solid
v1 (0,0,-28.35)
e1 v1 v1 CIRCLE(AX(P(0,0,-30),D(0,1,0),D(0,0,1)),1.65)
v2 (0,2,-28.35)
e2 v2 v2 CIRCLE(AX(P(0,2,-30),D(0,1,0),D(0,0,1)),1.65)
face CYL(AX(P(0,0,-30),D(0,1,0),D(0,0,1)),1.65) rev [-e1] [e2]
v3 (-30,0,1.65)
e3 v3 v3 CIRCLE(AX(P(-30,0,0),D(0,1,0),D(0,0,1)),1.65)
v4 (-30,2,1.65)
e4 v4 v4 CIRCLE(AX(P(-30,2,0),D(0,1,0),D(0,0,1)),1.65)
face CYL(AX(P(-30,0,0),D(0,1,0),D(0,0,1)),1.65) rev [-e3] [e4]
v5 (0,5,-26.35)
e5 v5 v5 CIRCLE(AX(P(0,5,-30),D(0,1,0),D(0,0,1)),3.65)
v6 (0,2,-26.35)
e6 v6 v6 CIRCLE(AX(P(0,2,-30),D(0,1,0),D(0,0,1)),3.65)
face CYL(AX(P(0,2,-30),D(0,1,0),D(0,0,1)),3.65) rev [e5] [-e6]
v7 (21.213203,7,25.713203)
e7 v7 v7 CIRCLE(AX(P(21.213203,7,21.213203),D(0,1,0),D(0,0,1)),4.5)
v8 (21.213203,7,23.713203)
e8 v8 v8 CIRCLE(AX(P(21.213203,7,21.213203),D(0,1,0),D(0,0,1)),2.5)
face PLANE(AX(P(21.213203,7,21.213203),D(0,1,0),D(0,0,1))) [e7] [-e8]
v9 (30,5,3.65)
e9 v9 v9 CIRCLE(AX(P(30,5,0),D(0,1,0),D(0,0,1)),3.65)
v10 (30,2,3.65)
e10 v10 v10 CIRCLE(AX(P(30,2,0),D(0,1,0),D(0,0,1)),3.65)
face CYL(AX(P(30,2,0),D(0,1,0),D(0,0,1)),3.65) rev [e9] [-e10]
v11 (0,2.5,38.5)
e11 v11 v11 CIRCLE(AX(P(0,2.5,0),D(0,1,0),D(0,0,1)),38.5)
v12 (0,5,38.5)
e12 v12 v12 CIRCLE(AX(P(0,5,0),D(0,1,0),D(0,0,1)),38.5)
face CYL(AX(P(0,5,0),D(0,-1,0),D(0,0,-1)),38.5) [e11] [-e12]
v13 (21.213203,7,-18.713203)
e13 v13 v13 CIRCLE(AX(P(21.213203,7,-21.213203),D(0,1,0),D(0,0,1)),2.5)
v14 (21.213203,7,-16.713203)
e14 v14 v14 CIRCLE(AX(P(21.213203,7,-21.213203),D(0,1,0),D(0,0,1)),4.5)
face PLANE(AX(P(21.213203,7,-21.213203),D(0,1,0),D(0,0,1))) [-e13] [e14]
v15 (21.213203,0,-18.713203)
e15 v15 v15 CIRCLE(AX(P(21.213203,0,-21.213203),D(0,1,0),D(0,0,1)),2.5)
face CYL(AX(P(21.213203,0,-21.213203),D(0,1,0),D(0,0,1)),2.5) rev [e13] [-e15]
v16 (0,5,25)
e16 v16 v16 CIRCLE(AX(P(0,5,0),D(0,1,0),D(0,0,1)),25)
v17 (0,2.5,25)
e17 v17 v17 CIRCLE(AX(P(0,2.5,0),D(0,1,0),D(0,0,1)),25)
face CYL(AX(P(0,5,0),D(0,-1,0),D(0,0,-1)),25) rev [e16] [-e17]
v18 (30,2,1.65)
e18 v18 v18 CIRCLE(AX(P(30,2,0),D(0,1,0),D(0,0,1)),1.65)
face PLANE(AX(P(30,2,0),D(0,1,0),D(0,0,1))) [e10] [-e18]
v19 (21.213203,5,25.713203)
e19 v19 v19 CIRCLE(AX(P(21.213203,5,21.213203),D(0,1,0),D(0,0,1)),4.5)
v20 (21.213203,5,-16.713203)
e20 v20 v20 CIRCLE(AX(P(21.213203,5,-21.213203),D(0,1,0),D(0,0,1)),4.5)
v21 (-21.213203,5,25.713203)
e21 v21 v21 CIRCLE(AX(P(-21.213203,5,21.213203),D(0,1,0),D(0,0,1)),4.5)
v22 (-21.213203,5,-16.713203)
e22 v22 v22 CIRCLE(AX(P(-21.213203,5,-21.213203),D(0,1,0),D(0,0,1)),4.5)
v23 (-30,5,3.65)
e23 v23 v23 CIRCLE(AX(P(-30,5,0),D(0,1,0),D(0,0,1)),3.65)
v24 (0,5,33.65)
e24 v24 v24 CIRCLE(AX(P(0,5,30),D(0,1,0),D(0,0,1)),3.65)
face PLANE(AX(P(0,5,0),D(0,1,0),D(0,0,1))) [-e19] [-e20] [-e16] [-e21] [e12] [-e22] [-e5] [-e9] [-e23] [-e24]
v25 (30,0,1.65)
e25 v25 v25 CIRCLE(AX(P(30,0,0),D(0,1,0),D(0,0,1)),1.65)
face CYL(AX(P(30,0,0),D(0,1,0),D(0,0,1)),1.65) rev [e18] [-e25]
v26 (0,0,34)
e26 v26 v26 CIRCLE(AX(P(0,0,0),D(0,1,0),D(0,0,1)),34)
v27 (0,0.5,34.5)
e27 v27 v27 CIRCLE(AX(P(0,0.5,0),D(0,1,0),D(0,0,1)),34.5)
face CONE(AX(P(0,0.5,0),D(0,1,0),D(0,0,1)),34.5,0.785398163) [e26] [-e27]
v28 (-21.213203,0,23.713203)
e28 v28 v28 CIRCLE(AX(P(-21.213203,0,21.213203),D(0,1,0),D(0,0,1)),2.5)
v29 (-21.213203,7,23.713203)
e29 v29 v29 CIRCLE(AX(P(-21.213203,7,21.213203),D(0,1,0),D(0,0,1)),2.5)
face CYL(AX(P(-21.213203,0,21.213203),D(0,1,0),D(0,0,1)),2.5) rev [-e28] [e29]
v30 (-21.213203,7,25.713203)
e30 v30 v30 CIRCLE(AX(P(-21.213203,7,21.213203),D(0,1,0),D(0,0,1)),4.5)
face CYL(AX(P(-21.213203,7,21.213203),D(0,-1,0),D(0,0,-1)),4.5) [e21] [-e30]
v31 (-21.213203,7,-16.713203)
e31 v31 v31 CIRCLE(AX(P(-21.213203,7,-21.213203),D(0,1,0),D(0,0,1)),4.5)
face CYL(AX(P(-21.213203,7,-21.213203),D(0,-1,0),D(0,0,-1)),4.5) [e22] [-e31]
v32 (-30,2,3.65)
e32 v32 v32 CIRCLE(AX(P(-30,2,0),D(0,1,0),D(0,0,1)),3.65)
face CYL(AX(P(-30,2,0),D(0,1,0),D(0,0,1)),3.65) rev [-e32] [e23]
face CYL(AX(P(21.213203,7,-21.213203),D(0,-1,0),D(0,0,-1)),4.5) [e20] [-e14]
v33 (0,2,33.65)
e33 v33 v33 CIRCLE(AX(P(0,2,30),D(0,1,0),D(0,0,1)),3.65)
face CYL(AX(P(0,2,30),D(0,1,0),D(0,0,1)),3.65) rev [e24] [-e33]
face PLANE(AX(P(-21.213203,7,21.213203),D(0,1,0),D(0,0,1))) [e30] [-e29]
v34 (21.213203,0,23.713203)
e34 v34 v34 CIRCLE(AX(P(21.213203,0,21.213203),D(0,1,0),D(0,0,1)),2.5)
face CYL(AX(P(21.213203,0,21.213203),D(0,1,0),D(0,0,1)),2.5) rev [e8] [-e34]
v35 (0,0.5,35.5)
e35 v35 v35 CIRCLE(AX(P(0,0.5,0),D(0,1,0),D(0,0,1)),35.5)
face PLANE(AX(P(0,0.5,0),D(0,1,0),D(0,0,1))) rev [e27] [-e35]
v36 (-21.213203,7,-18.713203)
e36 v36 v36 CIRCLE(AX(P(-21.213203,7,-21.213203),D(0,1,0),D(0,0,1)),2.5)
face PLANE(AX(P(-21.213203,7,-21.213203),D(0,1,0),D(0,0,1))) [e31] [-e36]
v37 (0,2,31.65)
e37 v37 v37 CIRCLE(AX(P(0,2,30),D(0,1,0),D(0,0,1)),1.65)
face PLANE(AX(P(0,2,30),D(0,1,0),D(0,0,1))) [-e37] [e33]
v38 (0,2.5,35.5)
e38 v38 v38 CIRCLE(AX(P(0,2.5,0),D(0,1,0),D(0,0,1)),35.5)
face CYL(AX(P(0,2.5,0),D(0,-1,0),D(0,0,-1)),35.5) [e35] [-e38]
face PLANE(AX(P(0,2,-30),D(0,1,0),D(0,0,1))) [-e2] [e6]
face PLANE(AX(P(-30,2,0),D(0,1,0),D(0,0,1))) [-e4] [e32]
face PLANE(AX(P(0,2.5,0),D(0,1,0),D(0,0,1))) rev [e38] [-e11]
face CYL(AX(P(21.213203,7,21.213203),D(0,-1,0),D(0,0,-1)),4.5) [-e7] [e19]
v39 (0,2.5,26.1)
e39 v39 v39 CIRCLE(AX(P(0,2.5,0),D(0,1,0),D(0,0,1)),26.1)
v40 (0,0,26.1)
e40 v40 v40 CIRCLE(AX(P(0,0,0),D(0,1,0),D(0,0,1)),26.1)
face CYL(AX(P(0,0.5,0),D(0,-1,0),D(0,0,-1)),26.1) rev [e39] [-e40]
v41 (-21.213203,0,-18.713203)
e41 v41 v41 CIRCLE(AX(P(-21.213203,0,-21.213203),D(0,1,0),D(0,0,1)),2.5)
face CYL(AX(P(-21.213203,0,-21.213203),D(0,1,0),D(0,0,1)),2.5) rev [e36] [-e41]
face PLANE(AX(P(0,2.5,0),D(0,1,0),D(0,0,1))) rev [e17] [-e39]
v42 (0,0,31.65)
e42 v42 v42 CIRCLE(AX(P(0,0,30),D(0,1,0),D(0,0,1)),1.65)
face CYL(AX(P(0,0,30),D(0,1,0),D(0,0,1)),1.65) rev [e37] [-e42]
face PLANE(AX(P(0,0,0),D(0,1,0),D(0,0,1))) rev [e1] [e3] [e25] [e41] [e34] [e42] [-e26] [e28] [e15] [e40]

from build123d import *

# Parameters (mm, degrees)
SKETCH1_R           = 34
SKETCH1_R_2         = 26.1
BOSS_EXTRUDE1_DEPTH = 0.5
SKETCH2_R           = 35.5
SKETCH2_R_2         = 26.1
BOSS_EXTRUDE2_DEPTH = 2
SKETCH3_R           = 38.5
SKETCH3_R_2         = 25
BOSS_EXTRUDE3_DEPTH = 2.5
CHAMFER1_SIZE       = 0.5
SKETCH4_R           = 1.65
SKETCH4_R_2         = 2.5
CUT_EXTRUDE1_DEPTH  = 55.676320286
SKETCH6_R           = 3.65
SKETCH6_R_2         = 1.65
CUT_EXTRUDE2_DEPTH  = 3
BOSS_EXTRUDE4_START = 2
SKETCH7_R           = 4.5
SKETCH7_R_2         = 2.5
BOSS_EXTRUDE4_DEPTH = 2


with BuildPart() as part:
    # Sketch1 → Boss-Extrude1 (new body)
    with BuildSketch(Plane(origin=(0, 0, 0), x_dir=(1, 0, 0), z_dir=(0, 1, 0))):
        with Locations(Location((0, 0, 0), (0, 0, 270))):
            Circle(SKETCH1_R)
        with Locations(Location((0, 0, 0), (0, 0, 270))):
            Circle(SKETCH1_R_2, mode=Mode.SUBTRACT)
    extrude(amount=BOSS_EXTRUDE1_DEPTH)

    # Sketch2 → Boss-Extrude2 (add)
    with BuildSketch(Plane(origin=(0, 0.5, 0), x_dir=(1, 0, 0), z_dir=(0, 1, 0))):
        with Locations(Location((0, 0, 0), (0, 0, 270))):
            Circle(SKETCH2_R)
        with Locations(Location((0, 0, 0), (0, 0, 270))):
            Circle(SKETCH2_R_2, mode=Mode.SUBTRACT)
    extrude(amount=BOSS_EXTRUDE2_DEPTH)

    # Sketch3 → Boss-Extrude3 (add)
    with BuildSketch(Plane(origin=(0, 2.5, 0), x_dir=(1, 0, 0), z_dir=(0, 1, 0))):
        with Locations(Location((0, 0, 0), (0, 0, 270))):
            Circle(SKETCH3_R)
        with Locations(Location((0, 0, 0), (0, 0, 270))):
            Circle(SKETCH3_R_2, mode=Mode.SUBTRACT)
    extrude(amount=BOSS_EXTRUDE3_DEPTH)

    # Chamfer1
    chamfer1_edges = [part.edges().sort_by_distance(p)[0] for p in [
        (0, 0.5, -34),
    ]]
    chamfer(chamfer1_edges, length=CHAMFER1_SIZE - 0.0001)  # a hair under: the kernel refuses the full size

    # Sketch4 → Cut-Extrude1 (cut, through all)
    with BuildSketch(Plane(origin=(0, 5, 0), x_dir=(1, 0, 0), z_dir=(0, 1, 0))):
        with Locations(Location((0, 30, 0), (0, 0, 270))):
            Circle(SKETCH4_R)
        with Locations(Location((21.213203436, 21.213203436, 0), (0, 0, 270))):
            Circle(SKETCH4_R_2)
        with Locations(Location((30, 0, 0), (0, 0, 270))):
            Circle(SKETCH4_R)
        with Locations(Location((21.213203436, -21.213203436, 0), (0, 0, 270))):
            Circle(SKETCH4_R_2)
        with Locations(Location((0, -30, 0), (0, 0, 270))):
            Circle(SKETCH4_R)
        with Locations(Location((-21.213203436, -21.213203436, 0), (0, 0, 270))):
            Circle(SKETCH4_R_2)
        with Locations(Location((-30, 0, 0), (0, 0, 270))):
            Circle(SKETCH4_R)
        with Locations(Location((-21.213203436, 21.213203436, 0), (0, 0, 270))):
            Circle(SKETCH4_R_2)
    extrude(amount=-CUT_EXTRUDE1_DEPTH, mode=Mode.SUBTRACT)

    # Sketch6 → Cut-Extrude2 (cut)
    # profile 1 of 4: a face of its own
    with BuildSketch(Plane(origin=(0, 5, 0), x_dir=(1, 0, 0), z_dir=(0, 1, 0))):
        with Locations(Location((0, -30, 0), (0, 0, 270))):
            Circle(SKETCH6_R)
        with Locations(Location((0, -30, 0), (0, 0, 270))):
            Circle(SKETCH6_R_2, mode=Mode.SUBTRACT)
    # profile 2 of 4: a face of its own
    with BuildSketch(Plane(origin=(0, 5, 0), x_dir=(1, 0, 0), z_dir=(0, 1, 0))):
        with Locations(Location((30, 0, 0), (0, 0, 270))):
            Circle(SKETCH6_R)
        with Locations(Location((30, 0, 0), (0, 0, 270))):
            Circle(SKETCH6_R_2, mode=Mode.SUBTRACT)
    # profile 3 of 4: a face of its own
    with BuildSketch(Plane(origin=(0, 5, 0), x_dir=(1, 0, 0), z_dir=(0, 1, 0))):
        with Locations(Location((0, 30, 0), (0, 0, 270))):
            Circle(SKETCH6_R)
        with Locations(Location((0, 30, 0), (0, 0, 270))):
            Circle(SKETCH6_R_2, mode=Mode.SUBTRACT)
    # profile 4 of 4: a face of its own
    with BuildSketch(Plane(origin=(0, 5, 0), x_dir=(1, 0, 0), z_dir=(0, 1, 0))):
        with Locations(Location((-30, 0, 0), (0, 0, 270))):
            Circle(SKETCH6_R)
        with Locations(Location((-30, 0, 0), (0, 0, 270))):
            Circle(SKETCH6_R_2, mode=Mode.SUBTRACT)
    extrude(amount=-CUT_EXTRUDE2_DEPTH, mode=Mode.SUBTRACT)

    # Sketch7 → Boss-Extrude4 (add)
    # profile 1 of 4: a face of its own
    with BuildSketch(Plane(origin=(0, 5, 0), x_dir=(1, 0, 0), z_dir=(0, 1, 0)).offset(BOSS_EXTRUDE4_START)):
        with Locations(Location((-21.213203436, 21.213203436, 0), (0, 0, 270))):
            Circle(SKETCH7_R)
        with Locations(Location((-21.213203436, 21.213203436, 0), (0, 0, 270))):
            Circle(SKETCH7_R_2, mode=Mode.SUBTRACT)
    # profile 2 of 4: a face of its own
    with BuildSketch(Plane(origin=(0, 5, 0), x_dir=(1, 0, 0), z_dir=(0, 1, 0)).offset(BOSS_EXTRUDE4_START)):
        with Locations(Location((21.213203436, 21.213203436, 0), (0, 0, 270))):
            Circle(SKETCH7_R)
        with Locations(Location((21.213203436, 21.213203436, 0), (0, 0, 270))):
            Circle(SKETCH7_R_2, mode=Mode.SUBTRACT)
    # profile 3 of 4: a face of its own
    with BuildSketch(Plane(origin=(0, 5, 0), x_dir=(1, 0, 0), z_dir=(0, 1, 0)).offset(BOSS_EXTRUDE4_START)):
        with Locations(Location((21.213203436, -21.213203436, 0), (0, 0, 270))):
            Circle(SKETCH7_R)
        with Locations(Location((21.213203436, -21.213203436, 0), (0, 0, 270))):
            Circle(SKETCH7_R_2, mode=Mode.SUBTRACT)
    # profile 4 of 4: a face of its own
    with BuildSketch(Plane(origin=(0, 5, 0), x_dir=(1, 0, 0), z_dir=(0, 1, 0)).offset(BOSS_EXTRUDE4_START)):
        with Locations(Location((-21.213203436, -21.213203436, 0), (0, 0, 270))):
            Circle(SKETCH7_R)
        with Locations(Location((-21.213203436, -21.213203436, 0), (0, 0, 270))):
            Circle(SKETCH7_R_2, mode=Mode.SUBTRACT)
    extrude(amount=-BOSS_EXTRUDE4_DEPTH)


solid = part.part
